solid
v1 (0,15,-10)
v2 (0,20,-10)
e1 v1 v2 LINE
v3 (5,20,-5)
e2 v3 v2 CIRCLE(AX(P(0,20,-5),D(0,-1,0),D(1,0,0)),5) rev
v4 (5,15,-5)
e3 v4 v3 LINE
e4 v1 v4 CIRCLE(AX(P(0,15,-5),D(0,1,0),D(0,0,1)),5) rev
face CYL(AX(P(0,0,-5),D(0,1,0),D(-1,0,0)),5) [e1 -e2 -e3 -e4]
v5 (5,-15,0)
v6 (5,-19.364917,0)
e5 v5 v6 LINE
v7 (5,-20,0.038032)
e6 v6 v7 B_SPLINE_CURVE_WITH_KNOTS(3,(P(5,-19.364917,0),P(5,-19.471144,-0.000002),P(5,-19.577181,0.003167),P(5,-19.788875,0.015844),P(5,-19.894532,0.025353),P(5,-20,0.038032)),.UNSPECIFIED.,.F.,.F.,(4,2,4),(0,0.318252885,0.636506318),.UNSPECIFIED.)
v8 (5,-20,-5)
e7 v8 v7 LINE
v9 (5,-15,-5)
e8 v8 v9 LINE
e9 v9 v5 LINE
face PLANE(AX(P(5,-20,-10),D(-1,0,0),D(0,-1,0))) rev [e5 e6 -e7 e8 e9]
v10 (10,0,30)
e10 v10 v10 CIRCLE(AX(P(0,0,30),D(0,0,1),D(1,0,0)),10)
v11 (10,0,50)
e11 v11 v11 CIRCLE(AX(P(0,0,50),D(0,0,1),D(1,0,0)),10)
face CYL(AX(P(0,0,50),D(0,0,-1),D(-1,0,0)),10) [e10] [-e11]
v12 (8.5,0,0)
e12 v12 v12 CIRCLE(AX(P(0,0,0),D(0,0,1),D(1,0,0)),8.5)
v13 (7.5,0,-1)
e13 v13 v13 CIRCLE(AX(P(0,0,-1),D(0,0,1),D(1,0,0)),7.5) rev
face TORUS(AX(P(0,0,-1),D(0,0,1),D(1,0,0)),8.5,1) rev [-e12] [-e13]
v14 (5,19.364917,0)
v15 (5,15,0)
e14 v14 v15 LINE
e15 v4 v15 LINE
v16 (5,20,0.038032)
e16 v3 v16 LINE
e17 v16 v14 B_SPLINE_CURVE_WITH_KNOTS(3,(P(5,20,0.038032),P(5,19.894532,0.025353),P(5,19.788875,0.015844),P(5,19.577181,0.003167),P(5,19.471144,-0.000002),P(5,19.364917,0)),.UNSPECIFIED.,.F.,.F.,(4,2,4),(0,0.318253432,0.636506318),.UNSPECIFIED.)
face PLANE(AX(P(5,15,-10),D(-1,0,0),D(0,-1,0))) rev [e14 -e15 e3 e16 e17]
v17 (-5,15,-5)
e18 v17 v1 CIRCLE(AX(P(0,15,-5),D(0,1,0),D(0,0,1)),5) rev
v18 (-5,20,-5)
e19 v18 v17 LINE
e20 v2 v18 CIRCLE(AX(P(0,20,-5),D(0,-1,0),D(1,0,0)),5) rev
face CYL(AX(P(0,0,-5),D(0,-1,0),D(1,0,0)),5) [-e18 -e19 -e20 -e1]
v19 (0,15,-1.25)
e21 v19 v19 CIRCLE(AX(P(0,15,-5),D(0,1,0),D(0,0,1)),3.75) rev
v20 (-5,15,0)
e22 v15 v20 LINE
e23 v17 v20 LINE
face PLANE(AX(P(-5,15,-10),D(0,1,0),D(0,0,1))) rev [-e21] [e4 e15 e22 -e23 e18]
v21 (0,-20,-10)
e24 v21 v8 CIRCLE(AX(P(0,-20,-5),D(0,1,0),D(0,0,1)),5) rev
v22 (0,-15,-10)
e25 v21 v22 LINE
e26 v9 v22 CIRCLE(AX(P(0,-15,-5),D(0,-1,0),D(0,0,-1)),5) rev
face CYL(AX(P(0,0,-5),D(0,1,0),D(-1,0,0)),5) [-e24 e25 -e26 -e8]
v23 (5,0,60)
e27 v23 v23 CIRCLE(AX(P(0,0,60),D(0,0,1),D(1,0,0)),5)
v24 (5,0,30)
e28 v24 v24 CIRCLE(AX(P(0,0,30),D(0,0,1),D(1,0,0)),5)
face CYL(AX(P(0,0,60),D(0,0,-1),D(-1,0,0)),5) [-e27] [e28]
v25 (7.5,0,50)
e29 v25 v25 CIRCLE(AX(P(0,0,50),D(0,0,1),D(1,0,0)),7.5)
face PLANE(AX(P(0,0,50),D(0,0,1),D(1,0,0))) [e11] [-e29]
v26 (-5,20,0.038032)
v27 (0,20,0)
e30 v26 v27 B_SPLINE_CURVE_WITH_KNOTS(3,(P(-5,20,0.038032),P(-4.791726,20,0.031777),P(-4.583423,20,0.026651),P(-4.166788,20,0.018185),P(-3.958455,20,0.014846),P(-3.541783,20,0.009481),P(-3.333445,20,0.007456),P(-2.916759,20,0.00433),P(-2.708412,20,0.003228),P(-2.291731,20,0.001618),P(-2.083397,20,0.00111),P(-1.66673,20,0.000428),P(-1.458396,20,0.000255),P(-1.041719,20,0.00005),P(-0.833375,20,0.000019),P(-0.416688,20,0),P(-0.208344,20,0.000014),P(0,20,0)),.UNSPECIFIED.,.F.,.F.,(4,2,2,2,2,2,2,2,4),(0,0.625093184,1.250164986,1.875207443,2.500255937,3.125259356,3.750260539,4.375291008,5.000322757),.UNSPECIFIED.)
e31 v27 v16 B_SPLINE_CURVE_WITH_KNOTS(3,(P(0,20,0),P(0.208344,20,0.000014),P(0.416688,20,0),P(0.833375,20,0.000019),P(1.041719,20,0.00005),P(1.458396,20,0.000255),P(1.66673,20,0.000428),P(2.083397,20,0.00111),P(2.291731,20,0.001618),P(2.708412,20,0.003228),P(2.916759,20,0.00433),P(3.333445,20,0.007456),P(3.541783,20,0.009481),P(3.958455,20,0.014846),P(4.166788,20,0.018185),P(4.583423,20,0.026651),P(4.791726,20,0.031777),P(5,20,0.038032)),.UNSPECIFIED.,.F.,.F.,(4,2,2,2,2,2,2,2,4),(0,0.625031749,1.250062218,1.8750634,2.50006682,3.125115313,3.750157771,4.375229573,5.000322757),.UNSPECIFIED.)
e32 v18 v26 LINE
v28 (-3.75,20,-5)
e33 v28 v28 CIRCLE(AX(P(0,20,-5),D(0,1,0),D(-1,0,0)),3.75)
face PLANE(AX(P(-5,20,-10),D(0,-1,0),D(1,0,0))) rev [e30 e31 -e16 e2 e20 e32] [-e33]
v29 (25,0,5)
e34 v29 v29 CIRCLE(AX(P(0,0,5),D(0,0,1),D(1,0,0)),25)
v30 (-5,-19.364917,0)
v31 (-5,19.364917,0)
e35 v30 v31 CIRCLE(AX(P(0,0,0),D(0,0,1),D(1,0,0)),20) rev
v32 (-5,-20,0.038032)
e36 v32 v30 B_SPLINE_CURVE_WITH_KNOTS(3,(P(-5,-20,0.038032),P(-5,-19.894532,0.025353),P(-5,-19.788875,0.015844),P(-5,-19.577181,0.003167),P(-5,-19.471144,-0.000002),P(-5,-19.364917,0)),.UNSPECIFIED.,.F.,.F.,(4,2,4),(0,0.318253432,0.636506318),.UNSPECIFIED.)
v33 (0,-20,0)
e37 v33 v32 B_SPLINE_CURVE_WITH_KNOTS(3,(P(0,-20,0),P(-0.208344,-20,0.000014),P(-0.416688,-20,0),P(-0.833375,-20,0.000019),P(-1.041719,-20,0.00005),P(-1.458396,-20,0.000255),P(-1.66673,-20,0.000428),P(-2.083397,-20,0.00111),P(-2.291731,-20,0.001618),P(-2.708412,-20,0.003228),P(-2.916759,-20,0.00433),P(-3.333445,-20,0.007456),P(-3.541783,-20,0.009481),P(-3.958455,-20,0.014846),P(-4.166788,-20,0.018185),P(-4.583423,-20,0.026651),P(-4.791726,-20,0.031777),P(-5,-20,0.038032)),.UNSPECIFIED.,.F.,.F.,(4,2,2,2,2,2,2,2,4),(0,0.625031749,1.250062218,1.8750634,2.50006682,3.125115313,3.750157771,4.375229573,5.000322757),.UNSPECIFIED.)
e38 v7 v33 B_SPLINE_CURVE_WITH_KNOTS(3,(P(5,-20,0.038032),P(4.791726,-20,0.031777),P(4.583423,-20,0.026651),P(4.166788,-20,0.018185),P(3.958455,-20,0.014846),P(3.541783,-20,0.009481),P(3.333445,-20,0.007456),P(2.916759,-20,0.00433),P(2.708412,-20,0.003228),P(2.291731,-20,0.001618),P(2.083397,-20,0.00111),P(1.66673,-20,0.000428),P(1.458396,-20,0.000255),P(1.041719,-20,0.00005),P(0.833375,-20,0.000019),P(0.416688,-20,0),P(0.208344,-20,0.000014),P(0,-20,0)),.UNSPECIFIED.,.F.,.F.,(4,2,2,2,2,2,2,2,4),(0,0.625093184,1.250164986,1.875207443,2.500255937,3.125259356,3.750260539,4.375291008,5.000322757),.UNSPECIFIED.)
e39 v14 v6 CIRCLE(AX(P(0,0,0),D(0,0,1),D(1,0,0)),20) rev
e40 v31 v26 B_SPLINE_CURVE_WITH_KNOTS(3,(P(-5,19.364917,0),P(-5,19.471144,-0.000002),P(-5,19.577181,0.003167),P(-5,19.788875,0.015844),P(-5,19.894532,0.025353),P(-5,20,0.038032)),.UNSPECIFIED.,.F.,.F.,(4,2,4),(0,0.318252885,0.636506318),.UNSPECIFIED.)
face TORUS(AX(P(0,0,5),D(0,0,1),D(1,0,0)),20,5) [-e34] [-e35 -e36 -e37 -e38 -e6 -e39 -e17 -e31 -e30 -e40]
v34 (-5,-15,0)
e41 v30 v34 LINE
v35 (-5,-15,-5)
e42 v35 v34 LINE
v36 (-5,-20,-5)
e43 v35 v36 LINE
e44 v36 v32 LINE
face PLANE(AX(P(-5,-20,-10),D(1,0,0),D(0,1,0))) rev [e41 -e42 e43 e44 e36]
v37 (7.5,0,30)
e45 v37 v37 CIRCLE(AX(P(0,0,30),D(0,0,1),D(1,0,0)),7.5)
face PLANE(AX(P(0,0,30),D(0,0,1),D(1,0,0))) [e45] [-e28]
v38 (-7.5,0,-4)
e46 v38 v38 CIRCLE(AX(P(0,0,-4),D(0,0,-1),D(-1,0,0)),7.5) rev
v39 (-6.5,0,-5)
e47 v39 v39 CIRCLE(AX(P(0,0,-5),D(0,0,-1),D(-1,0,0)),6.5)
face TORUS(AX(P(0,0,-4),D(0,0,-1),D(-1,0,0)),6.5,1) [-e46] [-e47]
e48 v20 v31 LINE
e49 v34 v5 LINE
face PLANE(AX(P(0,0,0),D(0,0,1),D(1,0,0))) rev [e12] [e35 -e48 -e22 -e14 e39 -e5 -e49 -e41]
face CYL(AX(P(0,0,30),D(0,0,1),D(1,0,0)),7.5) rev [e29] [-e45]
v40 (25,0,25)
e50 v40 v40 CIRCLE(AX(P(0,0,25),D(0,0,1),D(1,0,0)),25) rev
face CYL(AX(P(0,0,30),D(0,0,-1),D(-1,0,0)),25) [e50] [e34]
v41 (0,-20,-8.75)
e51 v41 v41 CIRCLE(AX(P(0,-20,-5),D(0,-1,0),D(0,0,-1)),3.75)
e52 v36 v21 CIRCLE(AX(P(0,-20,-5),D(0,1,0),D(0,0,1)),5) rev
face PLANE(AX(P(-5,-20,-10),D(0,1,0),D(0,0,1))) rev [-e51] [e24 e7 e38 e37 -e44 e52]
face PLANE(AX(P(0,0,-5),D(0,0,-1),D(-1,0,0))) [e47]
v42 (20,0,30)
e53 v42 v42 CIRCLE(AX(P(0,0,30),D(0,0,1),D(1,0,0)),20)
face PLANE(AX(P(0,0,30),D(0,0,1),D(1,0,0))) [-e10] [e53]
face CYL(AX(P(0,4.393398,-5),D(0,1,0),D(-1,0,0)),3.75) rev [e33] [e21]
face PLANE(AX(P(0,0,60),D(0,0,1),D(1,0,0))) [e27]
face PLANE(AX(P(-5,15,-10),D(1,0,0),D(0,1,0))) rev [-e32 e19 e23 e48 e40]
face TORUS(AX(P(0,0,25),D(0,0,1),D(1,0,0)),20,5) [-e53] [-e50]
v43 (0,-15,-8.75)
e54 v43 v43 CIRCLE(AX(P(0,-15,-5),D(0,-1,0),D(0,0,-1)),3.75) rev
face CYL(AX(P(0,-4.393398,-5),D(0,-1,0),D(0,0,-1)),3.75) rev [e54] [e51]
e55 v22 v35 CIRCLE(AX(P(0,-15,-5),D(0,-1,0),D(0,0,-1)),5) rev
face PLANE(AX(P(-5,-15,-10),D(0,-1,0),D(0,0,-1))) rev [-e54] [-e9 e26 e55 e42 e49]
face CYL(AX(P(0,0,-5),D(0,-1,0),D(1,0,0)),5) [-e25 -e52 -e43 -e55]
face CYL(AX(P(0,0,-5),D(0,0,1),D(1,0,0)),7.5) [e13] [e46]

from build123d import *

# Parameters (mm, degrees)
SKETCH1_R           = 25
BOSS_EXTRUDE1_DEPTH = 30
SKETCH2_R           = 10
BOSS_EXTRUDE2_DEPTH = 20
SKETCH3_R           = 7.5
CUT_EXTRUDE1_DEPTH  = 20
SKETCH4_R           = 5
BOSS_EXTRUDE3_DEPTH = 30
SKETCH5_R           = 7.5
BOSS_EXTRUDE4_DEPTH = 5
SKETCH7_W           = 10
SKETCH7_H           = 5
BOSS_EXTRUDE5_DEPTH = 10
SKETCH8_R           = 3.75
CUT_EXTRUDE2_DEPTH  = 5
CUT_EXTRUDE3_START  = -5
SKETCH9_R           = 3.75
CUT_EXTRUDE3_DEPTH  = 5
FILLET1_R           = 5
FILLET2_R           = 5
FILLET3_R           = 1


# Some blends are built 0.0001 mm under size
with BuildPart() as part:
    # Sketch1 → Boss-Extrude1 (new body)
    with BuildSketch(Plane.XY):
        Circle(SKETCH1_R)
    extrude(amount=BOSS_EXTRUDE1_DEPTH)

    # Sketch2 → Boss-Extrude2 (add)
    with BuildSketch(Plane.XY.offset(30)):
        Circle(SKETCH2_R)
    extrude(amount=BOSS_EXTRUDE2_DEPTH)

    # Sketch3 → Cut-Extrude1 (cut)
    with BuildSketch(Plane.XY.offset(50)):
        Circle(SKETCH3_R)
    extrude(amount=-CUT_EXTRUDE1_DEPTH, mode=Mode.SUBTRACT)

    # Sketch4 → Boss-Extrude3 (add)
    with BuildSketch(Plane.XY.offset(30)):
        Circle(SKETCH4_R)
    extrude(amount=BOSS_EXTRUDE3_DEPTH)

    # Sketch5 → Boss-Extrude4 (add)
    with BuildSketch(Plane(origin=(0, 0, 0), x_dir=(-1, 0, 0), z_dir=(0, 0, -1))):
        with Locations(Location((0, 0, 0), (0, 0, 180))):
            Circle(SKETCH5_R)
    extrude(amount=BOSS_EXTRUDE4_DEPTH)

    # Sketch7 → Boss-Extrude5 (add)
    with BuildSketch(Plane(origin=(0, 0, 0), x_dir=(-1, 0, 0), z_dir=(0, 0, -1))):
        with Locations((0, 17.5)):
            Rectangle(SKETCH7_W, SKETCH7_H)
        with Locations((0, -17.5)):
            Rectangle(SKETCH7_W, SKETCH7_H)
    extrude(amount=BOSS_EXTRUDE5_DEPTH)

    # Sketch8 → Cut-Extrude2 (cut)
    with BuildSketch(Plane(origin=(0, 20, 0), x_dir=(1, 0, 0), z_dir=(0, 1, 0))):
        with Locations(Location((0, 5, 0), (0, 0, 180))):
            Circle(SKETCH8_R)
    extrude(amount=-CUT_EXTRUDE2_DEPTH, mode=Mode.SUBTRACT)

    # Sketch9 → Cut-Extrude3 (cut)
    with BuildSketch(Plane(origin=(0, -20, 0), x_dir=(-1, 0, 0), z_dir=(0, -1, 0)).offset(CUT_EXTRUDE3_START)):
        with Locations((0, 5)):
            Circle(SKETCH9_R)
    extrude(amount=CUT_EXTRUDE3_DEPTH, mode=Mode.SUBTRACT)

    # Fillet1
    # the kernel refuses this fillet: 5 mm, written as the material it takes off along each edge
    with BuildSketch(Plane(origin=(0, 0, 30), x_dir=(1, 0, 0), z_dir=(0, -1, 0))) as fillet1_piece_1:
        with BuildLine():
            CenterArc((25 - FILLET1_R, -FILLET1_R), FILLET1_R, 0, 90)
            Line((25 - FILLET1_R, 0), (25, 0))
            Line((25, 0), (25, -FILLET1_R))
        make_face()
    revolve(axis=Axis((0, 0, 30), (0, 0, 1)), mode=Mode.SUBTRACT)
    with BuildSketch(Plane(origin=(0, 0, 0), x_dir=(1, 0, 0), z_dir=(0, -1, 0))) as fillet1_piece_2_section:
        with BuildLine():
            CenterArc((25 - FILLET1_R, FILLET1_R), FILLET1_R, 270, 90)
            Line((25 - FILLET1_R, 0), (25, 0))
            Line((25, 0), (25, FILLET1_R))
        make_face()
    fillet1_piece_2 = revolve(axis=Axis((0, 0, 0), (0, 0, 1)), mode=Mode.PRIVATE)
    fillet1_piece_2 = split(fillet1_piece_2, bisect_by=Plane(origin=(5, 14.511659558, 1.419610571), z_dir=(1, 0, 0)), keep=Keep.TOP, mode=Mode.PRIVATE)
    add(fillet1_piece_2, mode=Mode.SUBTRACT)
    with BuildSketch(Plane(origin=(0, 0, 0), x_dir=(1, 0, 0), z_dir=(0, -1, 0))) as fillet1_piece_3_section:
        with BuildLine():
            CenterArc((25 - FILLET1_R, FILLET1_R), FILLET1_R, 270, 90)
            Line((25 - FILLET1_R, 0), (25, 0))
            Line((25, 0), (25, FILLET1_R))
        make_face()
    fillet1_piece_3 = revolve(axis=Axis((0, 0, 0), (0, 0, 1)), mode=Mode.PRIVATE)
    fillet1_piece_3 = split(fillet1_piece_3, bisect_by=Plane(origin=(4.6e-08, 20, 1.116734198), z_dir=(0, 1, 0)), keep=Keep.TOP, mode=Mode.PRIVATE)
    add(fillet1_piece_3, mode=Mode.SUBTRACT)
    with BuildSketch(Plane(origin=(0, 0, 0), x_dir=(1, 0, 0), z_dir=(0, -1, 0))) as fillet1_piece_4_section:
        with BuildLine():
            CenterArc((25 - FILLET1_R, FILLET1_R), FILLET1_R, 270, 90)
            Line((25 - FILLET1_R, 0), (25, 0))
            Line((25, 0), (25, FILLET1_R))
        make_face()
    fillet1_piece_4 = revolve(axis=Axis((0, 0, 0), (0, 0, 1)), mode=Mode.PRIVATE)
    fillet1_piece_4 = split(fillet1_piece_4, bisect_by=Plane(origin=(-4.6e-08, -20, 1.116734198), z_dir=(0, -1, 0)), keep=Keep.TOP, mode=Mode.PRIVATE)
    add(fillet1_piece_4, mode=Mode.SUBTRACT)
    with BuildSketch(Plane(origin=(0, 0, 0), x_dir=(1, 0, 0), z_dir=(0, -1, 0))) as fillet1_piece_5_section:
        with BuildLine():
            CenterArc((25 - FILLET1_R, FILLET1_R), FILLET1_R, 270, 90)
            Line((25 - FILLET1_R, 0), (25, 0))
            Line((25, 0), (25, FILLET1_R))
        make_face()
    fillet1_piece_5 = revolve(axis=Axis((0, 0, 0), (0, 0, 1)), mode=Mode.PRIVATE)
    fillet1_piece_5 = split(fillet1_piece_5, bisect_by=Plane(origin=(-5, 0, 1.419610538), z_dir=(-1, 0, 0)), keep=Keep.TOP, mode=Mode.PRIVATE)
    add(fillet1_piece_5, mode=Mode.SUBTRACT)

    # Fillet2
    fillet2_edges = [part.edges().sort_by_distance(p)[0] for p in [
        (5, -17.5, -10),
        (-5, -17.5, -10),
        (5, 17.5, -10),
        (-5, 17.5, -10),
    ]]
    fillet(fillet2_edges, radius=FILLET2_R - 0.0001)  # a hair under: the kernel refuses the full size

    # Fillet3
    fillet3_edges = [part.edges().sort_by_distance(p)[0] for p in [
        (-7.5, 0, 0),
        (-7.5, 0, -5),
    ]]
    fillet(fillet3_edges, radius=FILLET3_R)


solid = part.part
